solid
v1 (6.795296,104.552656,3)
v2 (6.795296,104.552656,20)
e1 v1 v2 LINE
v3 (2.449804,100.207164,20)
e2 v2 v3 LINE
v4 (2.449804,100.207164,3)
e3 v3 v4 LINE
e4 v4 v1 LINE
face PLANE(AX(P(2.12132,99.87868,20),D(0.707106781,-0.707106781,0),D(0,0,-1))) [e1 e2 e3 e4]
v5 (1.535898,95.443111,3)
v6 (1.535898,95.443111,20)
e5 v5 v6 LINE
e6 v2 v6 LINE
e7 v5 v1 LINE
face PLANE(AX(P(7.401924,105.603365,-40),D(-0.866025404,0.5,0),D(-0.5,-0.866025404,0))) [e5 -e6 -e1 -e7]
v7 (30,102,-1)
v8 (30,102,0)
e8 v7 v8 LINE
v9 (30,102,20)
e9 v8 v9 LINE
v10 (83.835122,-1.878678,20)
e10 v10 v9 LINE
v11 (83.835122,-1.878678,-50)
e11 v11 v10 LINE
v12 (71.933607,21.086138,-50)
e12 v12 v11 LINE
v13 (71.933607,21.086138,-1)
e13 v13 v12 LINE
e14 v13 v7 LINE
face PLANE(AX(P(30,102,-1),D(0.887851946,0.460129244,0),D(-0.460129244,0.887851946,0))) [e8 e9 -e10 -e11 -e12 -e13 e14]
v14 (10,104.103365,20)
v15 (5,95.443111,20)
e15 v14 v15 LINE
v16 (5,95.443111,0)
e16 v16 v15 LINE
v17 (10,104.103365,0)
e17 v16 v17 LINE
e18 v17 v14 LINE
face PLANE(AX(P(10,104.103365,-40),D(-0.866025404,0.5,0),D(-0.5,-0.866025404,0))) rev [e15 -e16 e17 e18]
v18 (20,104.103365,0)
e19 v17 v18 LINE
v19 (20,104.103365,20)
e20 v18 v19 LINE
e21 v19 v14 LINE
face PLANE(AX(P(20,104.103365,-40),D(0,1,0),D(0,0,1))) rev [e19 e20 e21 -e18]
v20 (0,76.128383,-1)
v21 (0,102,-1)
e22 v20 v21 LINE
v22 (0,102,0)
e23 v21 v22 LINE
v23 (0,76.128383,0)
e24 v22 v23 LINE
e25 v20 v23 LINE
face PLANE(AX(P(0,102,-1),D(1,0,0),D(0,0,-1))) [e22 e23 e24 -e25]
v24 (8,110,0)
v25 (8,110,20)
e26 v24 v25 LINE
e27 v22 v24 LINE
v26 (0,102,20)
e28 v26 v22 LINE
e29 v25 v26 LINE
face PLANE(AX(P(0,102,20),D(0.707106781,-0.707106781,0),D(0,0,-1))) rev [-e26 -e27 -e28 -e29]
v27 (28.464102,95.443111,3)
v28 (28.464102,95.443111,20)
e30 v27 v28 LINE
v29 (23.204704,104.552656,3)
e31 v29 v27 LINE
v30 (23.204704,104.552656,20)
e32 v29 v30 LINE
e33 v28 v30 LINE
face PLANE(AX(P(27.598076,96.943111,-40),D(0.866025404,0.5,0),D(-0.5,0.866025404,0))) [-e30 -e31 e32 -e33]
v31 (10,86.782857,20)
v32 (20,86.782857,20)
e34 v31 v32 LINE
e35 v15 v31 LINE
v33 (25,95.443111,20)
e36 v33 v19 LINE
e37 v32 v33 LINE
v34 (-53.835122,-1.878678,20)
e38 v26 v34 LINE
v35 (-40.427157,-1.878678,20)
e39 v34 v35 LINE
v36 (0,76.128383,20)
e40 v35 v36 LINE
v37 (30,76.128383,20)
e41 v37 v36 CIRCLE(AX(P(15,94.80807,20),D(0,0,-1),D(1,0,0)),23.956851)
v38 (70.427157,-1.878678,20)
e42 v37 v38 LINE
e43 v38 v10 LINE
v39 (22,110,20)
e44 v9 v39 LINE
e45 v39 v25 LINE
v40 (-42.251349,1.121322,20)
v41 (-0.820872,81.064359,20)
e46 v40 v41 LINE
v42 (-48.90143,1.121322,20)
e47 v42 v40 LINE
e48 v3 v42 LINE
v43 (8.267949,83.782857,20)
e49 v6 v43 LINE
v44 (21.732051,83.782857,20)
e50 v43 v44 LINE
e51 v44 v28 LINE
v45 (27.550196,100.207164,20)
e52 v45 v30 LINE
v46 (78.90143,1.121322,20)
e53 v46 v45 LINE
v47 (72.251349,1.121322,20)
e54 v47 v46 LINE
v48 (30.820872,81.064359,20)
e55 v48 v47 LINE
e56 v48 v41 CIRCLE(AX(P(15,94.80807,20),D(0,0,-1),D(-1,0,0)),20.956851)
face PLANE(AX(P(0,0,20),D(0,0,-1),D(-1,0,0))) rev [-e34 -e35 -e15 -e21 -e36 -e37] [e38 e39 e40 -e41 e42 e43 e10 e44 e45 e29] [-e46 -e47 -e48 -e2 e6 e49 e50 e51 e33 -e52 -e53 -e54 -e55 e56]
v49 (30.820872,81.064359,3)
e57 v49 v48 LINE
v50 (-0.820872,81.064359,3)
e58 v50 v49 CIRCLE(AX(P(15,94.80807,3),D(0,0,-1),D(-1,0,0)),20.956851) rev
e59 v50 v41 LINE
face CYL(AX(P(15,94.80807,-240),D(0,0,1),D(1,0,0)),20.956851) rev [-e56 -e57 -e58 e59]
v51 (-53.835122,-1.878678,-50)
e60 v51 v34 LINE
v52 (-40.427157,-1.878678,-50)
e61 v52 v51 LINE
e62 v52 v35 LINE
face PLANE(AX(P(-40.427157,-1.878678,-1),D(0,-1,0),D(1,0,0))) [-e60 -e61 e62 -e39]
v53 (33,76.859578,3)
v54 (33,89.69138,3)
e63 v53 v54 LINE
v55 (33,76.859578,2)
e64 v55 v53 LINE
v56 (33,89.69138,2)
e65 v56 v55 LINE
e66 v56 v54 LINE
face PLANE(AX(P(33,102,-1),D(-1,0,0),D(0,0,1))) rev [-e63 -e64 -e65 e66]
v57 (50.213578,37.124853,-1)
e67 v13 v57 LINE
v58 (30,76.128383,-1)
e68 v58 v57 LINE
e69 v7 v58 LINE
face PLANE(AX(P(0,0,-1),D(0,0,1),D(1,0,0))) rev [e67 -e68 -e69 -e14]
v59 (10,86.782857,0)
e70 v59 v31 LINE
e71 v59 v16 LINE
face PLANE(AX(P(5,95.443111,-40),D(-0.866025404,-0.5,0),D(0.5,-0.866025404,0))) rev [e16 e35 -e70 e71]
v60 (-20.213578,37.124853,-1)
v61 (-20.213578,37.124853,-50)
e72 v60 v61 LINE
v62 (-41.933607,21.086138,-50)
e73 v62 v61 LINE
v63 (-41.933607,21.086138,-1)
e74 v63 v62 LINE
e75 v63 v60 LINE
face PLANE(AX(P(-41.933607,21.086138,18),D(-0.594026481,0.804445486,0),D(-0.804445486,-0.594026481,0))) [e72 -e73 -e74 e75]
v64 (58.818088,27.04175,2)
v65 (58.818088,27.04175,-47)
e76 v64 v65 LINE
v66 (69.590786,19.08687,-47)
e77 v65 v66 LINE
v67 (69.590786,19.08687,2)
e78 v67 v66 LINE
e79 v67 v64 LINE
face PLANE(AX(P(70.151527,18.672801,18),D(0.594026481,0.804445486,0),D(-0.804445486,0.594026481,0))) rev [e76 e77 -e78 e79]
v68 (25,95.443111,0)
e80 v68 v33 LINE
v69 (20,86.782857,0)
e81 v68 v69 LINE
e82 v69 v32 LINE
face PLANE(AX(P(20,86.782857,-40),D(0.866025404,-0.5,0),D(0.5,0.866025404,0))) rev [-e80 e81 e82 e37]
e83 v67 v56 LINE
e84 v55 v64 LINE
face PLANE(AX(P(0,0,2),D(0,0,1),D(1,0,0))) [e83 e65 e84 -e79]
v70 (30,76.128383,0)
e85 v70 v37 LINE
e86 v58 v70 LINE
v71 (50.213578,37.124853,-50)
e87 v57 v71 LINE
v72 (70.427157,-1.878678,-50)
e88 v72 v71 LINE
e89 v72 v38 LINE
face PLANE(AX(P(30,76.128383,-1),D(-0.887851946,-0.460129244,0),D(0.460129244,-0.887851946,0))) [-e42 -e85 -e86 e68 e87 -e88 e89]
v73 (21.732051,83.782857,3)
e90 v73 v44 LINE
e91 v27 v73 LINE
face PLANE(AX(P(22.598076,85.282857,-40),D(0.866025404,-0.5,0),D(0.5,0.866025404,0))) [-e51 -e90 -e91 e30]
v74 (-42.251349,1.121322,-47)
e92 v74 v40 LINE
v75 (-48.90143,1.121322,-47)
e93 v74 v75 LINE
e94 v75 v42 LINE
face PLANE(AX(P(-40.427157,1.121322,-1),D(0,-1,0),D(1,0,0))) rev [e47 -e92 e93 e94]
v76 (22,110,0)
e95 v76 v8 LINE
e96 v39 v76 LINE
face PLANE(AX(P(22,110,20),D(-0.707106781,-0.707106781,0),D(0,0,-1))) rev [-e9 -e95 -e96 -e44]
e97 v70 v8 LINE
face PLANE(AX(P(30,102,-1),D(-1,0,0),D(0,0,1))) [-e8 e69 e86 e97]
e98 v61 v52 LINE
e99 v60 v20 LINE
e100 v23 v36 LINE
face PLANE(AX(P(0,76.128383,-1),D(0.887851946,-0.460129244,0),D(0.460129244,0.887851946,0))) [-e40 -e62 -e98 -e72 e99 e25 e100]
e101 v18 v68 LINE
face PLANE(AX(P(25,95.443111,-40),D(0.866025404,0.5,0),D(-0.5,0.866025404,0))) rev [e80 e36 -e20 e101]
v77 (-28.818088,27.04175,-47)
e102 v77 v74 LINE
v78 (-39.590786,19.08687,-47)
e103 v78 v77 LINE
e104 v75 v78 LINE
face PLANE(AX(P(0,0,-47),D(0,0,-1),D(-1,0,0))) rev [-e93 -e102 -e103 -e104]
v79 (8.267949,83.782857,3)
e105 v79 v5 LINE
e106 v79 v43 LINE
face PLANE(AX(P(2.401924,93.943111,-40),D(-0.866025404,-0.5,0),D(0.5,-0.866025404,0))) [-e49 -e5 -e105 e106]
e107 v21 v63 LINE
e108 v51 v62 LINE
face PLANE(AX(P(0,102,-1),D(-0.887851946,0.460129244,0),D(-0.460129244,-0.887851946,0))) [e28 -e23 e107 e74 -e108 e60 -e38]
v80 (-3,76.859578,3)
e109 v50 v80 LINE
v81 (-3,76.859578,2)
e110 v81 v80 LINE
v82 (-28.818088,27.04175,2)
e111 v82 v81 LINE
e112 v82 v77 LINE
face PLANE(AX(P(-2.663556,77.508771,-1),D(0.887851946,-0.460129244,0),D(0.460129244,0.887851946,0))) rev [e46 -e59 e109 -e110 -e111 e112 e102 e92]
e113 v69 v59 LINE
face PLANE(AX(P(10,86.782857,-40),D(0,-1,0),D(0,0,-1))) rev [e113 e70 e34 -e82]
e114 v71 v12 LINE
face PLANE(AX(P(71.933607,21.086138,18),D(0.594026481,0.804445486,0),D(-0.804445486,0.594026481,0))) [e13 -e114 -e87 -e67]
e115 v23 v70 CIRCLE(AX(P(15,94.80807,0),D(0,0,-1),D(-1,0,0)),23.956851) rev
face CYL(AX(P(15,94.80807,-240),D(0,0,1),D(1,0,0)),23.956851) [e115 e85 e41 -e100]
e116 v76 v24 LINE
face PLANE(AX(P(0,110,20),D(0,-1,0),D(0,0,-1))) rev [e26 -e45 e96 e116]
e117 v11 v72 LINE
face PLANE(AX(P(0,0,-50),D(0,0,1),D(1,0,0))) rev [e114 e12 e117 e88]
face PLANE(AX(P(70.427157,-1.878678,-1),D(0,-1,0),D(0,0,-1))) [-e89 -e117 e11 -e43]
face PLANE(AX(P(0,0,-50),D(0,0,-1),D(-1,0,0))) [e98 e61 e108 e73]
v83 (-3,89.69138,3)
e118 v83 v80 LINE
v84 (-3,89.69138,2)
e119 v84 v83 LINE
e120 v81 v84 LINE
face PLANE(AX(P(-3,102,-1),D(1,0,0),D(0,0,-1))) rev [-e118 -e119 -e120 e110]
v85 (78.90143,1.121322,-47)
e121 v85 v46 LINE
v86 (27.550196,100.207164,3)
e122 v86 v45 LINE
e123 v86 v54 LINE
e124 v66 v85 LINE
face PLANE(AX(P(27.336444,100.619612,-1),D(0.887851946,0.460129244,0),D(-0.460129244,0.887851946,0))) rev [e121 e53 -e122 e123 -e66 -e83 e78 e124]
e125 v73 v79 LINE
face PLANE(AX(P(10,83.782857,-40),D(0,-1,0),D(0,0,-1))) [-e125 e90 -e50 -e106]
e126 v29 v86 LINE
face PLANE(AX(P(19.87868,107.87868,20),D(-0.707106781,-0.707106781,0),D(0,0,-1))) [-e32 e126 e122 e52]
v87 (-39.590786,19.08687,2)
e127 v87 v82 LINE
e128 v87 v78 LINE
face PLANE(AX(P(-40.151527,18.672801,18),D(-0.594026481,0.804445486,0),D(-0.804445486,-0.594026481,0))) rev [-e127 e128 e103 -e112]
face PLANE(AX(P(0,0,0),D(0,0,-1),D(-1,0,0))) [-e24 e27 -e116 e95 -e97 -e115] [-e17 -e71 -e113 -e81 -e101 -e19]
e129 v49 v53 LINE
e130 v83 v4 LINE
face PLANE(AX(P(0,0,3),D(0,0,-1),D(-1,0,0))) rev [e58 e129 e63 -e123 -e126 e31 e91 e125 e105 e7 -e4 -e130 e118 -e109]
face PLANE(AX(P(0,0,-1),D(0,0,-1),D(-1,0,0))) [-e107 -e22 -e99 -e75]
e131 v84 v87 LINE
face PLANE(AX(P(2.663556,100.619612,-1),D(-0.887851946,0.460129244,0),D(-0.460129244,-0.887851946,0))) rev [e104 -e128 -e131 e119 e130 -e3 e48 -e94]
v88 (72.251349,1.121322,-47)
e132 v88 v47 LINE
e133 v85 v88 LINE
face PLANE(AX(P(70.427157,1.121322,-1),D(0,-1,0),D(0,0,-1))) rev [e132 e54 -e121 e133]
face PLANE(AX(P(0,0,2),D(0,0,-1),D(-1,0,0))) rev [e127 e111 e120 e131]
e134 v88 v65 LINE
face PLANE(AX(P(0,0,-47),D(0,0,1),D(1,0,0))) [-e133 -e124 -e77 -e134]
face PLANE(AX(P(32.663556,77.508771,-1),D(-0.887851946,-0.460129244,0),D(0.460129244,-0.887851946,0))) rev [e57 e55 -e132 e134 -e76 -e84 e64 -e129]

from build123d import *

# Parameters (mm, degrees)
SKETCH1_W                = 30
SKETCH1_H                = 110
BOSS_EXTRUDE1_DEPTH      = 20
CUT_EXTRUDE1_DEPTH       = 60
CHAMFER1_SIZE            = 8
BOSS_EXTRUDE2_DEPTH      = 21
BOSS_EXTRUDE3_DEPTH      = 50
BOSS_EXTRUDE3_DEPTH_BACK = 18
CUT_EXTRUDE3_DEPTH       = 260
SHELL1_START             = 3
SHELL1_DEPTH             = 17
SHELL1_START_2           = -47
SHELL1_2_DEPTH           = 50
SHELL1_START_3           = 2
SHELL1_3_DEPTH           = 1


# Read off the part's stored shape, not the designer's step: Shell1
with BuildPart() as part:
    # Sketch1 → Boss-Extrude1 (new body)
    with BuildSketch(Plane.XY):
        with Locations((15, 55)):
            Rectangle(SKETCH1_W, SKETCH1_H)
    extrude(amount=BOSS_EXTRUDE1_DEPTH)

    # Sketch2 → Cut-Extrude1 (cut)
    with BuildSketch(Plane.XY.offset(20)):
        Polygon((25, 95.443111243), (20, 104.103365281), (10, 104.103365281), (5, 95.443111243), (10, 86.782857205), (20, 86.782857205), align=None)
    extrude(amount=-CUT_EXTRUDE1_DEPTH, mode=Mode.SUBTRACT)

    # Chamfer1
    chamfer1_edges = [part.edges().sort_by_distance(p)[0] for p in [
        (0, 110, 10),
        (30, 110, 10),
    ]]
    chamfer(chamfer1_edges, length=CHAMFER1_SIZE)

    # Sketch3 → Boss-Extrude2 (add)
    with BuildSketch(Plane.XY.offset(20)):
        Polygon((-40.427156972, -1.878677735), (-53.835121548, -1.878677735), (0, 102), (0, 76.128383271), align=None)
        Polygon((30, 102), (83.835121548, -1.878677735), (70.427156972, -1.878677735), (30, 76.128383271), align=None)
    extrude(amount=-BOSS_EXTRUDE2_DEPTH)

    # Sketch5 → Boss-Extrude3 (add, two sides: drawn at the far end of the back side and taken through both)
    with BuildSketch(Plane(origin=(0, 0, 0), x_dir=(-1, 0, 0), z_dir=(0, 0, -1)).offset(-BOSS_EXTRUDE3_DEPTH_BACK)):
        Polygon((-83.835121548, -1.878677735), (-71.933606609, 21.086137785), (-50.213578486, 37.124852768), (-70.427156972, -1.878677735), align=None)
        Polygon((40.427156972, -1.878677735), (53.835121548, -1.878677735), (41.933606609, 21.086137785), (20.213578486, 37.124852768), align=None)
    extrude(amount=BOSS_EXTRUDE3_DEPTH + BOSS_EXTRUDE3_DEPTH_BACK)

    # Sketch8 → Cut-Extrude3 (cut)
    with BuildSketch(Plane.XY.offset(20)):
        with BuildLine():
            Line((0, 76.128383271), (0, -18.897317389))
            Line((0, -18.897317389), (30, -18.897317389))
            Line((30, -18.897317389), (30, 76.128383271))
            ThreePointArc((30, 76.128383271), (15, 70.851219372), (0, 76.128383271))
        make_face()
    extrude(amount=-CUT_EXTRUDE3_DEPTH, mode=Mode.SUBTRACT)

    # Shell1 outline → Shell1 (cut)
    with BuildSketch(Plane.XY.offset(SHELL1_START)):
        with BuildLine():
            Line((28.464101615, 95.443111243), (21.732050808, 83.782857205))
            Line((21.732050808, 83.782857205), (8.267949192, 83.782857205))
            Line((8.267949192, 83.782857205), (1.535898385, 95.443111243))
            Line((1.535898385, 95.443111243), (6.795296251, 104.552655563))
            Line((6.795296251, 104.552655563), (2.449804376, 100.207163689))
            Line((2.449804376, 100.207163689), (-48.901429901, 1.121322265))
            Line((-48.901429901, 1.121322265), (-42.251348803, 1.121322265))
            Line((-42.251348803, 1.121322265), (-0.820872426, 81.064359083))
            ThreePointArc((-0.820872426, 81.064359083), (15, 73.851219372), (30.820872426, 81.064359083))
            Line((30.820872426, 81.064359083), (72.251348803, 1.121322265))
            Line((72.251348803, 1.121322265), (78.901429901, 1.121322265))
            Line((78.901429901, 1.121322265), (27.550195624, 100.207163689))
            Line((27.550195624, 100.207163689), (23.204703749, 104.552655563))
            Line((23.204703749, 104.552655563), (28.464101615, 95.443111243))
        make_face()
    extrude(amount=SHELL1_DEPTH, mode=Mode.SUBTRACT)

    # Shell1 2 outline → Shell1 2 (cut)
    with BuildSketch(Plane.XY.offset(SHELL1_START_2)):
        Polygon((78.901429901, 1.121322265), (69.590785527, 19.086869637), (58.818087877, 27.041750092), (72.251348803, 1.121322265), align=None)
        Polygon((-28.818087877, 27.041750092), (-39.590785527, 19.086869637), (-48.901429901, 1.121322265), (-42.251348803, 1.121322265), align=None)
    extrude(amount=SHELL1_2_DEPTH, mode=Mode.SUBTRACT)

    # Shell1 3 outline → Shell1 3 (cut)
    with BuildSketch(Plane.XY.offset(SHELL1_START_3)):
        Polygon((69.590785527, 19.086869637), (33, 89.691380382), (33, 76.85957818), (58.818087877, 27.041750092), align=None)
        Polygon((-3, 76.85957818), (-3, 89.691380382), (-39.590785527, 19.086869637), (-28.818087877, 27.041750092), align=None)
    extrude(amount=SHELL1_3_DEPTH, mode=Mode.SUBTRACT)


solid = part.part
